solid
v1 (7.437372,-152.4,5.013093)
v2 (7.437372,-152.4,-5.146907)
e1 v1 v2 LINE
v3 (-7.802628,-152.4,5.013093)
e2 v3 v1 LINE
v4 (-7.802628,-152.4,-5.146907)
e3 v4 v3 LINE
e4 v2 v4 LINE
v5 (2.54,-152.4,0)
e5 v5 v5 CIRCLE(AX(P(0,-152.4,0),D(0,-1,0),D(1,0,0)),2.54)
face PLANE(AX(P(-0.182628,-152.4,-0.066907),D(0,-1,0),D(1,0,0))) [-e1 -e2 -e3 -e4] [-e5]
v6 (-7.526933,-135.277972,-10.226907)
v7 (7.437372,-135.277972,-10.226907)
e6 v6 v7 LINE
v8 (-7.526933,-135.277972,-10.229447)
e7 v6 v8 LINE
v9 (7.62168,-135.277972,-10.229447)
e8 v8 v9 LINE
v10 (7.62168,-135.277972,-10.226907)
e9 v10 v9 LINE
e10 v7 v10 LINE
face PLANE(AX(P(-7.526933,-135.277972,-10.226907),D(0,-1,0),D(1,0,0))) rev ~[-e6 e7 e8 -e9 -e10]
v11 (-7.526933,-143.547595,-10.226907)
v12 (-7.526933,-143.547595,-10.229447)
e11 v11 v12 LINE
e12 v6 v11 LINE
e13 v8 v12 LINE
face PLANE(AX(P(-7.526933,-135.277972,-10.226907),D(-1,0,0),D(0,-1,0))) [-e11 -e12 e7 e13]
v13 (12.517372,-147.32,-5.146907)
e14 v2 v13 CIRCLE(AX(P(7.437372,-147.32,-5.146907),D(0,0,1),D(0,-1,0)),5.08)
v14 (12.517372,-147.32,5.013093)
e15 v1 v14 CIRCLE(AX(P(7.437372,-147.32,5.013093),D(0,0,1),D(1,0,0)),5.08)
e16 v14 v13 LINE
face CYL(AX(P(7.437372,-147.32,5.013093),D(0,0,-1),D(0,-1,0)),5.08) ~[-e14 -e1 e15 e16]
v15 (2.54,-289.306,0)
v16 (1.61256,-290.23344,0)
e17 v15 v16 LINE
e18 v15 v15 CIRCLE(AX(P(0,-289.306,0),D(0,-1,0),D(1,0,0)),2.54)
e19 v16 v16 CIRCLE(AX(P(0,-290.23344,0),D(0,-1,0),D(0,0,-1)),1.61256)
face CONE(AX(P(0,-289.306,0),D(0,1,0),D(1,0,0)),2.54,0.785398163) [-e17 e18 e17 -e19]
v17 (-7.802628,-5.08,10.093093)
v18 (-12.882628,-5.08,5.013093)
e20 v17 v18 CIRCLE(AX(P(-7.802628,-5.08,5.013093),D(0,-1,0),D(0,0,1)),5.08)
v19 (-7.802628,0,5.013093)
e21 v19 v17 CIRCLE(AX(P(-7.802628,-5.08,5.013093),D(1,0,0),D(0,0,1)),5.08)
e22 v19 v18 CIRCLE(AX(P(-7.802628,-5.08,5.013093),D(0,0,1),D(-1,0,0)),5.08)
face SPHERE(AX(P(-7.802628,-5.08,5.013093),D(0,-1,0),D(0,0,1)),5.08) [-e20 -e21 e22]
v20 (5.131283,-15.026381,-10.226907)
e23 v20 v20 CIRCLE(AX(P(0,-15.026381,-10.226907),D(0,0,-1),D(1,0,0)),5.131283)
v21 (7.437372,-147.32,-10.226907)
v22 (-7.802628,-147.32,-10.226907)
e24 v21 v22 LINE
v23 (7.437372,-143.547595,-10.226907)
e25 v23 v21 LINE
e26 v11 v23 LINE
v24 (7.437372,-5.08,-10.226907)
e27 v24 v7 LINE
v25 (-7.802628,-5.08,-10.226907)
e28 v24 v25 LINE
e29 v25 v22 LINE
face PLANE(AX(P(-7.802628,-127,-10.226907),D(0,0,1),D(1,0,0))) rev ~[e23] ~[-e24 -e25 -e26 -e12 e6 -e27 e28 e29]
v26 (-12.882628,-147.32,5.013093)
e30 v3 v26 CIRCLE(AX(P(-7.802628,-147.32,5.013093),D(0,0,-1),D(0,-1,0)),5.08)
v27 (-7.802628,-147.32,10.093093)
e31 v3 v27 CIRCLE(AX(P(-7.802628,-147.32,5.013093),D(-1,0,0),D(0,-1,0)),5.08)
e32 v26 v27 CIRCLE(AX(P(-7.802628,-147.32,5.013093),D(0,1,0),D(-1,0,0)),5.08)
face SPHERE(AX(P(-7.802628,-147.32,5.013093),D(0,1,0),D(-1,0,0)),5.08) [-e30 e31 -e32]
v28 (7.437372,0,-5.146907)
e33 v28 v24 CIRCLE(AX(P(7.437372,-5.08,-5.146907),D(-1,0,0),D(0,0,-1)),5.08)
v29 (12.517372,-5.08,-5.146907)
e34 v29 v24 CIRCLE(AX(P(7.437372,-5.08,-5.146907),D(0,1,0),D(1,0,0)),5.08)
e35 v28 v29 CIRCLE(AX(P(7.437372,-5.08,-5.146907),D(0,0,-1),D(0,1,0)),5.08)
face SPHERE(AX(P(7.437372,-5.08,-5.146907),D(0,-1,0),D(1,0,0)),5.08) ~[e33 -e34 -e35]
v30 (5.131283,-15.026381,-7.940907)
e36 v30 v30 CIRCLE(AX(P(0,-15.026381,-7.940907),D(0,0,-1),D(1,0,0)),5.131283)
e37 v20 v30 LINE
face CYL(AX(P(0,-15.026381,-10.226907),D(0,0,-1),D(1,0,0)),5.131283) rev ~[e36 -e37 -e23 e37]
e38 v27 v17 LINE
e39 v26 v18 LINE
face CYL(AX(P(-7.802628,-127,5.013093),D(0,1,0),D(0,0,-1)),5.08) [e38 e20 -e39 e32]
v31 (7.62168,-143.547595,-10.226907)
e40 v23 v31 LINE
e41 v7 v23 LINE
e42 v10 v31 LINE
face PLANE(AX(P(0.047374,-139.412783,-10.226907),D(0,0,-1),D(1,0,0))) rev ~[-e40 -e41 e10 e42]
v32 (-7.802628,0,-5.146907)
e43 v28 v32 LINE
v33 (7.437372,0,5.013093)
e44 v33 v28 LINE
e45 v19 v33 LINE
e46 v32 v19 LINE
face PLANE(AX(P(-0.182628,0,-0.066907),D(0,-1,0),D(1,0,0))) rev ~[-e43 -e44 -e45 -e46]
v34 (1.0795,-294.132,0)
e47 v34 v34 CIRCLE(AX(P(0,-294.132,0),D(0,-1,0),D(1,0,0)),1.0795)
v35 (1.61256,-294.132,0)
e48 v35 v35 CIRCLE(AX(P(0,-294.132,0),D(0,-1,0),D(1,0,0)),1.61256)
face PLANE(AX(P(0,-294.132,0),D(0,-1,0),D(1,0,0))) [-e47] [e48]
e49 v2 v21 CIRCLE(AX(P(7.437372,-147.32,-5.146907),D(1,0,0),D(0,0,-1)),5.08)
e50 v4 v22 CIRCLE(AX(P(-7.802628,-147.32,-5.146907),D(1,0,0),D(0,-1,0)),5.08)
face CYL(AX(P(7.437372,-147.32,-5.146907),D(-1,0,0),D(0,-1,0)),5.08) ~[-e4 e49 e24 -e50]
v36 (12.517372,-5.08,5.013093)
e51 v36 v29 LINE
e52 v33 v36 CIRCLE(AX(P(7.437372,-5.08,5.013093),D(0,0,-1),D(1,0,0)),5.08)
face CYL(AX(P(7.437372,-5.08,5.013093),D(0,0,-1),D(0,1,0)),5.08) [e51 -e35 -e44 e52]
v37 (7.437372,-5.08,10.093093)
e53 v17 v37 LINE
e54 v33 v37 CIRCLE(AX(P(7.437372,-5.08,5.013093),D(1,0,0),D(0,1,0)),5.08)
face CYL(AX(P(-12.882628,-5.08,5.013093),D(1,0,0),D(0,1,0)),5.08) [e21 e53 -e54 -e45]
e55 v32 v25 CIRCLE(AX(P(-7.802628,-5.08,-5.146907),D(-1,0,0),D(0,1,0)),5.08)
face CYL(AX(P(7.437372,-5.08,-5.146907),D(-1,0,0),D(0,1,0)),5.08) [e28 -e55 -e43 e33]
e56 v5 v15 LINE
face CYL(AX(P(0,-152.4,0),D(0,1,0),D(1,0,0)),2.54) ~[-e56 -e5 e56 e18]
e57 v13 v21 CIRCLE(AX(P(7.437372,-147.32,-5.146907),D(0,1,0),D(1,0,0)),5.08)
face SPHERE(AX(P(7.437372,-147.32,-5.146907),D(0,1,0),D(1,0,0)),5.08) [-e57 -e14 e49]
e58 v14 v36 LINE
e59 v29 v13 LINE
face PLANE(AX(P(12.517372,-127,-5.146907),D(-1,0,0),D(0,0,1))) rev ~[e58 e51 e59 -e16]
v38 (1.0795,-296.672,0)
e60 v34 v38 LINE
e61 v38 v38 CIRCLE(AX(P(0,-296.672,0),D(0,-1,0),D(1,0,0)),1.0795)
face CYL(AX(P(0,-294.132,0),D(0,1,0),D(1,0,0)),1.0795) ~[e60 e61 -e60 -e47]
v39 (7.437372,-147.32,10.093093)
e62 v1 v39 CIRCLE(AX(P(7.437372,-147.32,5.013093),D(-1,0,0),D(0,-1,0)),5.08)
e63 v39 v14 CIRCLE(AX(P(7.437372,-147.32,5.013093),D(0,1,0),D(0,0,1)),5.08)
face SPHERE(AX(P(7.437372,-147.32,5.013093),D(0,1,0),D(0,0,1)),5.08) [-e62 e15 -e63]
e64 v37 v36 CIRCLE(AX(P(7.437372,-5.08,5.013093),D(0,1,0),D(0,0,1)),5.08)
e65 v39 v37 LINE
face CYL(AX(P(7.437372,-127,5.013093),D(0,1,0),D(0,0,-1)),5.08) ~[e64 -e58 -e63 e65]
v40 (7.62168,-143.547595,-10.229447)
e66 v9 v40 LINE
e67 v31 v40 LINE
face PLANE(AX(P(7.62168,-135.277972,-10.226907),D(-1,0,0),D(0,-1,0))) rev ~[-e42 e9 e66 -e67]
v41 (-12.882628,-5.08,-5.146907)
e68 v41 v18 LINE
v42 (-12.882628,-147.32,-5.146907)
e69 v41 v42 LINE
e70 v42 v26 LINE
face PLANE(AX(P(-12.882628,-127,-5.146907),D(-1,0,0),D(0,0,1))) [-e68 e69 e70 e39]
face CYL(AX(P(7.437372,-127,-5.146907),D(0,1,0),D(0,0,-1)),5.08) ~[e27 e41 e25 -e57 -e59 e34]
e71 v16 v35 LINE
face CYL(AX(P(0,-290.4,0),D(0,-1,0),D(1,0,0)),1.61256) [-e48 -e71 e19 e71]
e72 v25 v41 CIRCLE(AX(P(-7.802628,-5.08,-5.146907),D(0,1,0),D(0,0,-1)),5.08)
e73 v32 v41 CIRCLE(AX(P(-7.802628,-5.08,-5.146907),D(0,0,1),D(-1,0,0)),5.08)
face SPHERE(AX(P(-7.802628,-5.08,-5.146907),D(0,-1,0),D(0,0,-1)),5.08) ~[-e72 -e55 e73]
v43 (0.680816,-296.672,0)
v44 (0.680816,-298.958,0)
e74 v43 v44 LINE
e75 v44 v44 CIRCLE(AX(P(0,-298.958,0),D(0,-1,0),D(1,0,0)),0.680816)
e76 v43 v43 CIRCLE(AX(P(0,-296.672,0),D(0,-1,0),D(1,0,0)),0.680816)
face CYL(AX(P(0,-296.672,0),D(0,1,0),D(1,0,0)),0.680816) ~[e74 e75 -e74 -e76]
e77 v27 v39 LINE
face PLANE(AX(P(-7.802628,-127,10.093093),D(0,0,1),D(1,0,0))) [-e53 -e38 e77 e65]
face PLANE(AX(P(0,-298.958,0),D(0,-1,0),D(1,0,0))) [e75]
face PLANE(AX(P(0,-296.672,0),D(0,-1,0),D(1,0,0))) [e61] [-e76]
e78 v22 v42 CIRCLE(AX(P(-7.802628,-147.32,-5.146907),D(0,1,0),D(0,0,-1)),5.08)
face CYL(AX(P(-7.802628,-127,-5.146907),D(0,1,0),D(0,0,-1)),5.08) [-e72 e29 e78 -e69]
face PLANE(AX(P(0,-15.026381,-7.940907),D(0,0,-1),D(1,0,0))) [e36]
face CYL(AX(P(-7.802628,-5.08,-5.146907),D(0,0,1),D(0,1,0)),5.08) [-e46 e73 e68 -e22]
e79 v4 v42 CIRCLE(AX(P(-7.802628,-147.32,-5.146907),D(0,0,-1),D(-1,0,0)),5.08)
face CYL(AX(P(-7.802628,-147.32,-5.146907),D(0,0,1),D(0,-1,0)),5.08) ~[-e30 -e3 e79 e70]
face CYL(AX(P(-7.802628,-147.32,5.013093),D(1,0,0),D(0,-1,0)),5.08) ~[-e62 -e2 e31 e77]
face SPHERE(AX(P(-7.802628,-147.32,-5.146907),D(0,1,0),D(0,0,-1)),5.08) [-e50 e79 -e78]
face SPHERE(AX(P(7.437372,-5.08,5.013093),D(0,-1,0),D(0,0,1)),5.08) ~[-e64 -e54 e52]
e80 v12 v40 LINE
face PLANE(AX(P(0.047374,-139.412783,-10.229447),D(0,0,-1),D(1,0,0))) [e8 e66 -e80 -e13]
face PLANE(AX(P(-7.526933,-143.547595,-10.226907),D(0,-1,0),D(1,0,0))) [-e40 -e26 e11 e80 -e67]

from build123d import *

# Parameters (mm, degrees)
F0_W         = 25.4
F0_H         = 20.32
F1_DEPTH     = 127
F2_R         = 5.08
F3_R         = 5.08
F4_R         = 5.08
F5_DEPTH     = 25.4
F6_R         = 2.54
F7_DEPTH     = 139.192
F8_R         = 5.08
F9_R         = 1.6125595219
F10_DEPTH    = 2.54
F11_R        = 1.0795
F12_DEPTH    = 2.54
F13_R        = 0.680816043
F14_DEPTH    = 2.286
F15_S5_R     = 1.6125595219
F15_T6_DEPTH = 5
F16_R        = 5.1312830473
F17_DEPTH    = 2.286
F18_W        = 15.1486136019
F18_H        = 8.2696229219
F19_DEPTH    = 0.00254


# Not quite as in the source:
# - a fillet or chamfer that OpenCascade refuses, or shapes differently, is made with other operations: its cross-section is extruded or revolved along the edge and cut away or added


with BuildPart() as f1:
    # F0 (on Front) → F1 (new body)
    with BuildSketch(Plane.XZ):
        with Locations((-0.1826275468, -0.0669072086)):
            Rectangle(F0_W, F0_H)
    extrude(amount=F1_DEPTH)

    # F2
    f2_edges = [f1.edges().sort_by_distance(p)[0] for p in [
        (12.517372, -63.5, 10.093093),
        (12.517372, -63.5, -10.226907),
    ]]
    fillet(f2_edges, radius=F2_R)

    # F3
    f3_edges = [f1.edges().sort_by_distance(p)[0] for p in [
        (-12.882628, -63.5, -10.226907),
    ]]
    fillet(f3_edges, radius=F3_R)

    # F4
    f4_edges = [f1.edges().sort_by_distance(p)[0] for p in [
        (-12.882628, -63.5, 10.093093),
        (-12.882628, 0, 2.473093),
    ]]
    fillet(f4_edges, radius=F4_R)

    # F5 (add): a face of the model
    f5_faces = [f1.faces().sort_by_distance(p)[0] for p in [
        (-0.1826275468, -127, -0.0669072086),
    ]]
    extrude(f5_faces, amount=F5_DEPTH)

    # F6 (on face) → F7 (join)
    with BuildSketch(Plane.XZ.offset(152.4)):
        Circle(F6_R)
    extrude(amount=F7_DEPTH)

    # F8
    f8_edges = [f1.edges().sort_by_distance(p)[0] for p in [
        (-0.182628, -152.4, 10.093093),
        (-0.182628, -152.4, -10.226907),
        (12.517372, -152.4, -0.066907),
        (-12.882628, -152.4, -0.066907),
    ]]
    fillet(f8_edges, radius=F8_R)

    # F9 (on face) → F10 (join)
    with BuildSketch(Plane.XZ.offset(291.592)):
        Circle(F9_R)
    extrude(amount=F10_DEPTH)

    # F11 (on face) → F12 (join)
    with BuildSketch(Plane.XZ.offset(294.132)):
        Circle(F11_R)
    extrude(amount=F12_DEPTH)

    # F13 (on face) → F14 (join)
    with BuildSketch(Plane.XZ.offset(296.672)):
        Circle(F13_R)
    extrude(amount=F14_DEPTH)

    # F15: chamfer of 2.286 on 1 edges, made by hand


with BuildPart() as f15_tool2:
    # F15_s3 → F15_t4 (revolve)
    with BuildSketch(Plane.XY):
        Polygon((2.54, -289.306), (0.254, -291.592), (2.54, -291.592), align=None)
    revolve(axis=Axis((0, -291.592, 0), (0, -1, 0)))

    # F15_s5 → F15_t6 (cut, symmetric)
    with BuildSketch(Plane.XZ.offset(290.4)):
        Circle(F15_S5_R)
    extrude(amount=F15_T6_DEPTH, both=True, mode=Mode.SUBTRACT)


with BuildPart() as f1_1:
    add(f1.part)

    # F15_t1: cut F15_tool2
    add(f15_tool2.part, mode=Mode.SUBTRACT)

    # F16 (on face) → F17 (cut)
    with BuildSketch(Plane(origin=(0, 0, -10.2269072086), x_dir=(1, 0, 0), z_dir=(0, 0, -1))):
        with Locations((0, 15.0263812393)):
            Circle(F16_R)
    extrude(amount=-F17_DEPTH, mode=Mode.SUBTRACT)

    # F18 (on face) → F19 (join)
    with BuildSketch(Plane(origin=(0, 0, -10.2269072086), x_dir=(1, 0, 0), z_dir=(0, 0, -1))):
        with Locations((0.0473735854, 139.4127830863)):
            Rectangle(F18_W, F18_H)
    extrude(amount=F19_DEPTH)


solid = f1_1.part
